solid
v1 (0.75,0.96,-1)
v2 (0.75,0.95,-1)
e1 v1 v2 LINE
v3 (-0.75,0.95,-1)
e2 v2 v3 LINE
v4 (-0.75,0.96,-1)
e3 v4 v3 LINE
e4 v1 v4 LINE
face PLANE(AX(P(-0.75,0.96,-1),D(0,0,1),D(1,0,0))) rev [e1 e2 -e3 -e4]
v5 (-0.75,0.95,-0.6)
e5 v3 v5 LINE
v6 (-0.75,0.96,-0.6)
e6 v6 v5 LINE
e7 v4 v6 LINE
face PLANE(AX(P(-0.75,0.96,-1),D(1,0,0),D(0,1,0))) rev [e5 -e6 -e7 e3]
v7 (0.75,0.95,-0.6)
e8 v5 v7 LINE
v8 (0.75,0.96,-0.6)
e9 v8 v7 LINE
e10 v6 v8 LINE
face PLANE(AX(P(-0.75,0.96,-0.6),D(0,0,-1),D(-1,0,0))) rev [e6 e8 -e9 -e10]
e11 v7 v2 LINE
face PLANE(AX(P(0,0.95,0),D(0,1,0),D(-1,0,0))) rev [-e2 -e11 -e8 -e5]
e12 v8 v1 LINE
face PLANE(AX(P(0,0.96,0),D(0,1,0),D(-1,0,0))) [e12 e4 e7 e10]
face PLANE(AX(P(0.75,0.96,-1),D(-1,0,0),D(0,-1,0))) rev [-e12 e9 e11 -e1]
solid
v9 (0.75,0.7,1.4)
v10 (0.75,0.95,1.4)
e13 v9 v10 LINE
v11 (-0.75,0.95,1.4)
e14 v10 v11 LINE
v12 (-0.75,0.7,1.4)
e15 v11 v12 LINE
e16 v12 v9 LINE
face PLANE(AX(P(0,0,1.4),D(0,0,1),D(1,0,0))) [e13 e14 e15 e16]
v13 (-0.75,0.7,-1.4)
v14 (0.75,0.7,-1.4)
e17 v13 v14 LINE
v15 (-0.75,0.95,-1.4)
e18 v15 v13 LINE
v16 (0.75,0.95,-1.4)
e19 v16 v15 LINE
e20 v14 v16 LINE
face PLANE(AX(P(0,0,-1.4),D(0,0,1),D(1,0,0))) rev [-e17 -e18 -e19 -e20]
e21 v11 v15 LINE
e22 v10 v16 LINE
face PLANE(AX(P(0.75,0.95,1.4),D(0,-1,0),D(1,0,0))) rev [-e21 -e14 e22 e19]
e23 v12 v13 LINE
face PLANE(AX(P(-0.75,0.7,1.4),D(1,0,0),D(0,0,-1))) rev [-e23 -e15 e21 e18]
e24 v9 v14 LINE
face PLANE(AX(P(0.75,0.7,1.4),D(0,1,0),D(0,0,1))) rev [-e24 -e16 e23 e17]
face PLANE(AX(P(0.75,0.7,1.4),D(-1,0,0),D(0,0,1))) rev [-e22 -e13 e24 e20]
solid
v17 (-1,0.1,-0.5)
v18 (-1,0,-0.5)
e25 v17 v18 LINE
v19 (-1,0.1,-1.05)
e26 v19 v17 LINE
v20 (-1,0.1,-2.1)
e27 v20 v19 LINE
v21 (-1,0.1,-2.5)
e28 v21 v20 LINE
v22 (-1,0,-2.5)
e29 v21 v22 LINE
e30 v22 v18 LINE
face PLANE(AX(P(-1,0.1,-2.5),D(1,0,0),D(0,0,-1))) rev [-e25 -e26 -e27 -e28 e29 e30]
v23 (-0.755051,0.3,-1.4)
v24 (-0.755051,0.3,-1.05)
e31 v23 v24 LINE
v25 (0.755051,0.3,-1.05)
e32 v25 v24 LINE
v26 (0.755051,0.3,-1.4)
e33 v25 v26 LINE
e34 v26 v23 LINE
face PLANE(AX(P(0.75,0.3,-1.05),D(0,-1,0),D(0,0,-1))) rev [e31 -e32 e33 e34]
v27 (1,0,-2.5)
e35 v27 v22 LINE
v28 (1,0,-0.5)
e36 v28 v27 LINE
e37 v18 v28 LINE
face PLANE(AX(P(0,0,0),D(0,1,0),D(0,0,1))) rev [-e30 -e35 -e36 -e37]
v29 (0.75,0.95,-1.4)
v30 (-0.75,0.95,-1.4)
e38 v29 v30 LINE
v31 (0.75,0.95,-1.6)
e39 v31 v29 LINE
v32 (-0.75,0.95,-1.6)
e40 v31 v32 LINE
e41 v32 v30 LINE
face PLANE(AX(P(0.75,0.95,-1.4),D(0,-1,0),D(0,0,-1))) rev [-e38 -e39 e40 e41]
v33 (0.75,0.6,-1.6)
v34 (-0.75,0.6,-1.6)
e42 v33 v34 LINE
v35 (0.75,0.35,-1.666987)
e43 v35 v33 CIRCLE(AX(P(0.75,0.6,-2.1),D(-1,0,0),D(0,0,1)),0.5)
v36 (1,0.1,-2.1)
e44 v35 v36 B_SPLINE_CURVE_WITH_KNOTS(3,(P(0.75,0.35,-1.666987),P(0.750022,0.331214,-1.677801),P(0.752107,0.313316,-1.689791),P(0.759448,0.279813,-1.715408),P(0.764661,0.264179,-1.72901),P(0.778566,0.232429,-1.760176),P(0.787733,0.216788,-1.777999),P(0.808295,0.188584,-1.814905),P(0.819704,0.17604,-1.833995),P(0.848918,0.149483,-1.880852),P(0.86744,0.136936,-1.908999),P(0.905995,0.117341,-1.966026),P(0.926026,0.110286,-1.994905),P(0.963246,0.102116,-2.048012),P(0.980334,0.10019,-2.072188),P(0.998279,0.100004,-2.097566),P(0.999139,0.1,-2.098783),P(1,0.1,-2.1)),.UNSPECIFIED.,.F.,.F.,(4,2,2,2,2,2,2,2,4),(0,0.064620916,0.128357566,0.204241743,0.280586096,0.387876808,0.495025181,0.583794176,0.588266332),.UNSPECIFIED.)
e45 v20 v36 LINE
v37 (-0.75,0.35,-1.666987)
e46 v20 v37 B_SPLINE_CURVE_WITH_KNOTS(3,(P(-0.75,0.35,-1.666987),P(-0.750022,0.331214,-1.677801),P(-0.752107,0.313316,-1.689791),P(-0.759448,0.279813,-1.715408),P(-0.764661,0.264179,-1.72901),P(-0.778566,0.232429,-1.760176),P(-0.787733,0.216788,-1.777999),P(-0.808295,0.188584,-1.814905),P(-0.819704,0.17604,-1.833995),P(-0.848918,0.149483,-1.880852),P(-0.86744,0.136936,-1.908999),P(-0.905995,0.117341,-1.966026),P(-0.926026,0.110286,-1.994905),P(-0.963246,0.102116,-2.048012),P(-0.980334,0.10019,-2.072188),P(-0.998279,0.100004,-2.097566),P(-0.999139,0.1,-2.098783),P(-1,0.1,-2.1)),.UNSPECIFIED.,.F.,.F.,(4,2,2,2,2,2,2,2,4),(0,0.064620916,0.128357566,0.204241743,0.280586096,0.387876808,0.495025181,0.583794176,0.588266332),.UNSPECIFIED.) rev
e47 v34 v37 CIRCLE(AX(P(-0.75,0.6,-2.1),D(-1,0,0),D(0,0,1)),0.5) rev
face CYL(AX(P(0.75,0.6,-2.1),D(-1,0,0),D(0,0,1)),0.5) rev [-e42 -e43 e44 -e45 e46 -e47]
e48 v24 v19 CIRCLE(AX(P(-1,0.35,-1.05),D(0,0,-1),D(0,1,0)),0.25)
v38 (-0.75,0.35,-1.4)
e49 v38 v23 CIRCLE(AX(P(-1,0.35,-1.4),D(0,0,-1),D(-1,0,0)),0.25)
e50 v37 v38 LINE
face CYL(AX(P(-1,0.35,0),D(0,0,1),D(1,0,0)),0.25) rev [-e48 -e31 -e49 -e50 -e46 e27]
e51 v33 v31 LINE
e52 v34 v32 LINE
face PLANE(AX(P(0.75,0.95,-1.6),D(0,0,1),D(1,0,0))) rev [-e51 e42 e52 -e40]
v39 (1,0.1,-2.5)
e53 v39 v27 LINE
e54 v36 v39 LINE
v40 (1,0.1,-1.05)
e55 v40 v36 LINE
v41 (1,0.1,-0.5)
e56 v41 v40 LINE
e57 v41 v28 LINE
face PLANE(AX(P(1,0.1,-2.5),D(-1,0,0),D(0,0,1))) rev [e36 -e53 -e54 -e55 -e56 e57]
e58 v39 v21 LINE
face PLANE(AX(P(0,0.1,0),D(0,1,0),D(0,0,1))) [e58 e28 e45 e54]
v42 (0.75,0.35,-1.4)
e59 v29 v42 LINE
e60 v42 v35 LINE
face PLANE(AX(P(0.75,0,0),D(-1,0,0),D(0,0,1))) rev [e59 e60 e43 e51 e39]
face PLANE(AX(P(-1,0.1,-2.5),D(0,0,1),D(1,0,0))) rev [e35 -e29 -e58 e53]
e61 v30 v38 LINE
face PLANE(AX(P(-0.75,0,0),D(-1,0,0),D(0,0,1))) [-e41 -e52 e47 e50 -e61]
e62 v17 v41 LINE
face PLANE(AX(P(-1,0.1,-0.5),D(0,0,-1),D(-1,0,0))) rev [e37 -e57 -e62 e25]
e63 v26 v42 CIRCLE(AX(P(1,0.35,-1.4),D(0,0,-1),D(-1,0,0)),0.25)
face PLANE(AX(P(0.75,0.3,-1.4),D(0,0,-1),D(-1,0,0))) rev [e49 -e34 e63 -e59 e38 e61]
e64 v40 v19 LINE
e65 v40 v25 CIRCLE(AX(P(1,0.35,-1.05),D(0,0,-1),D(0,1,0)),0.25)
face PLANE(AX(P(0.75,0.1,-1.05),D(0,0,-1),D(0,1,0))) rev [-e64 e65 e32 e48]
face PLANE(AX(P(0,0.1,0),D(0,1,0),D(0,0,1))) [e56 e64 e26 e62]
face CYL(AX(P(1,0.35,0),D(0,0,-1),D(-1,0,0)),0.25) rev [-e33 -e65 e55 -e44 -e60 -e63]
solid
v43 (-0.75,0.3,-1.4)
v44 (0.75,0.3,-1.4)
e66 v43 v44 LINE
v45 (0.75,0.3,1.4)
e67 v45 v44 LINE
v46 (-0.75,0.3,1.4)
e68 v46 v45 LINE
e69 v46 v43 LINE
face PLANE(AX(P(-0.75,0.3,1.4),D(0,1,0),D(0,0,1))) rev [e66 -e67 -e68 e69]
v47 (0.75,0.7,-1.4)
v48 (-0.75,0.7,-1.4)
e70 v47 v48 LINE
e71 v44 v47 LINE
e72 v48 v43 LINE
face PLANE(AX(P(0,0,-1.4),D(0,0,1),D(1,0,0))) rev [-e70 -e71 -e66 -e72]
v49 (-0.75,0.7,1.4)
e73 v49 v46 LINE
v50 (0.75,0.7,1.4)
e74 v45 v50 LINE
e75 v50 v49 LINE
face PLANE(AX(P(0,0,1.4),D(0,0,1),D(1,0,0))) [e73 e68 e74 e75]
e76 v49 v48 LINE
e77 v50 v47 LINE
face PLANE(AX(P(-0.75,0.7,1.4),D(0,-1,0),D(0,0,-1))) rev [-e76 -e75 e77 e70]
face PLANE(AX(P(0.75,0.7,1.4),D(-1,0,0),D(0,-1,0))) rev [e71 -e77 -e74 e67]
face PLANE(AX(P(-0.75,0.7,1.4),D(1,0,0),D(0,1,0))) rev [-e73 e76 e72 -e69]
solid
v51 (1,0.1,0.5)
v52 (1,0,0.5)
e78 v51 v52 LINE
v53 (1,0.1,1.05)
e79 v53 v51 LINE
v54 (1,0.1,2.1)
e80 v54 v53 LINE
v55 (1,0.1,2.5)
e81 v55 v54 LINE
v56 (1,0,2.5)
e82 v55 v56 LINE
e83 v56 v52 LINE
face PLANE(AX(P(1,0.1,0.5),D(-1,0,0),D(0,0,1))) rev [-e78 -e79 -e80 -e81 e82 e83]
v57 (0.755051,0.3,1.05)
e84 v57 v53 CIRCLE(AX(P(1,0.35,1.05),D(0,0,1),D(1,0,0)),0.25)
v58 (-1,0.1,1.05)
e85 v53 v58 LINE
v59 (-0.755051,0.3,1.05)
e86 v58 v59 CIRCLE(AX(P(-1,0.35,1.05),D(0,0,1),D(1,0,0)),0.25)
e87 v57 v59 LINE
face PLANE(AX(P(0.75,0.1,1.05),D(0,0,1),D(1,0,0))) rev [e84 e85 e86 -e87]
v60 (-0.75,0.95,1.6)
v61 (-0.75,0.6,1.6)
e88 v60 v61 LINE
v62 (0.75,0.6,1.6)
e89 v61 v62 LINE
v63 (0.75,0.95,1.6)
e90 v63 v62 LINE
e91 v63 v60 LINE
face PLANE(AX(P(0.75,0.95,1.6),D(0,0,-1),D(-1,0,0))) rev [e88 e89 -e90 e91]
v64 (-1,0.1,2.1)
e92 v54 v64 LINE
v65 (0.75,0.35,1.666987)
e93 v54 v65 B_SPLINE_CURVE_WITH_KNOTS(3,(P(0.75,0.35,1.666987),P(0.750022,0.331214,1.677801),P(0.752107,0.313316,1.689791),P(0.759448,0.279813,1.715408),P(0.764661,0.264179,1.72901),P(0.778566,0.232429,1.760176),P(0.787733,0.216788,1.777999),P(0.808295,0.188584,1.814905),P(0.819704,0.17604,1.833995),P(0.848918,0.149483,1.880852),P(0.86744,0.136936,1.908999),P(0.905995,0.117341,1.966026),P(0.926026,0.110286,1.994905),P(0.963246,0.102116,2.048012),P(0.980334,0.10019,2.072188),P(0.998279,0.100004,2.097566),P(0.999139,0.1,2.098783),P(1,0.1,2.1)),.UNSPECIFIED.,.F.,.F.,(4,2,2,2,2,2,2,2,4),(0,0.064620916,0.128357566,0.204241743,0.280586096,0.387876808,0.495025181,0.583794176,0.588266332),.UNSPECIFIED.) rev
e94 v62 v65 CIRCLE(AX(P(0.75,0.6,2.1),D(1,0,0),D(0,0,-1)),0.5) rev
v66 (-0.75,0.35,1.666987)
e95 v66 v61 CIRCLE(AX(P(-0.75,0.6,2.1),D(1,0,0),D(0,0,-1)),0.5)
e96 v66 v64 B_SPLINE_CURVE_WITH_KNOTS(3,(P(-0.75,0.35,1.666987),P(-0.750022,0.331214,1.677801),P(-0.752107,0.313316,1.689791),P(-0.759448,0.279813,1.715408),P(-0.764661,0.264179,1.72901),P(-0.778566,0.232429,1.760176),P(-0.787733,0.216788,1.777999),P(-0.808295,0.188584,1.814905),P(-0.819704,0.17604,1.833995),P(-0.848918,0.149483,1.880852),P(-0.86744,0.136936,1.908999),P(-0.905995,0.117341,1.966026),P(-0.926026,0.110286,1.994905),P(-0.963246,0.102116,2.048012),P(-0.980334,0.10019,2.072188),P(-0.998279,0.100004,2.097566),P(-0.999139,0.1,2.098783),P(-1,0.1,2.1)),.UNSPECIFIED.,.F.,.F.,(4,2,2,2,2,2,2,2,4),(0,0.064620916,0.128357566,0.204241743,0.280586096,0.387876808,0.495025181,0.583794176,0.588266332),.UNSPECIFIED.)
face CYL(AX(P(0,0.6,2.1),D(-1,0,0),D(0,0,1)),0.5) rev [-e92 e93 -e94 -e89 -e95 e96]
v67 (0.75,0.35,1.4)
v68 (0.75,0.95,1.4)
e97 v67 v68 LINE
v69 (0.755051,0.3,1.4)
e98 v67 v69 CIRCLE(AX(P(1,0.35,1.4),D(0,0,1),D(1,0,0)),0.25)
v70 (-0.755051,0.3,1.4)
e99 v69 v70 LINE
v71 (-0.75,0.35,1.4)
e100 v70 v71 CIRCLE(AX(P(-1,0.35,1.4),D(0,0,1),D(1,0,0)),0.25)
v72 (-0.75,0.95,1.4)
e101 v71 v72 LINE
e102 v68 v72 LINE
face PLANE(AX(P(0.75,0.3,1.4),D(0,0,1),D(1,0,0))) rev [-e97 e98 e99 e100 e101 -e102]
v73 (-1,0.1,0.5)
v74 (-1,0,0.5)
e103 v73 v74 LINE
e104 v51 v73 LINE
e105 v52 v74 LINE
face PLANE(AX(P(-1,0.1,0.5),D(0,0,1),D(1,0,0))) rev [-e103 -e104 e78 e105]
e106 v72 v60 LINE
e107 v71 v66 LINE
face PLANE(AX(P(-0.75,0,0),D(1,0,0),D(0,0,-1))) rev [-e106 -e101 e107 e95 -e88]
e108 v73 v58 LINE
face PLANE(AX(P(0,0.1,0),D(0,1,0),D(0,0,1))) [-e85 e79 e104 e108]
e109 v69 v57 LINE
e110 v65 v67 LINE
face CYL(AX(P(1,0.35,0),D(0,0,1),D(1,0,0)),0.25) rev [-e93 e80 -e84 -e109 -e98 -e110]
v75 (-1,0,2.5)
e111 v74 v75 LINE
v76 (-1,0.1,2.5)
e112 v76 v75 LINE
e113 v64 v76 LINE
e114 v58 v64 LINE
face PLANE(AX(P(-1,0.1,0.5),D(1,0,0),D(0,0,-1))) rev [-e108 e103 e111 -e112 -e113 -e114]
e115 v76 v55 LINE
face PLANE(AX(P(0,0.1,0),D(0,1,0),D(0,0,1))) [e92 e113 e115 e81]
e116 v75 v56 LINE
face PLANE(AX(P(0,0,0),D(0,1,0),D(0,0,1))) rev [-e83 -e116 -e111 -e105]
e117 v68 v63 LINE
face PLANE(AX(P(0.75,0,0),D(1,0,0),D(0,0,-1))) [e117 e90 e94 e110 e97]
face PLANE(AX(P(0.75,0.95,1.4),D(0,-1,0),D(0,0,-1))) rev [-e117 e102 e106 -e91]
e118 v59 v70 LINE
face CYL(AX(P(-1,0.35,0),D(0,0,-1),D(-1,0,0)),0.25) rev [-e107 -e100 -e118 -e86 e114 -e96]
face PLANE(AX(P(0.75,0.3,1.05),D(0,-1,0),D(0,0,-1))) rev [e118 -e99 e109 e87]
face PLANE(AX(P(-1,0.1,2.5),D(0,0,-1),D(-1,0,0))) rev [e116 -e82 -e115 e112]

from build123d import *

# Parameters (mm, degrees)
SKETCH1_W             = 1.5
SKETCH1_H             = 0.4
BOSS_EXTRUDE1_DEPTH   = 1.4
BOSS_EXTRUDE2_DEPTH   = 0.75
BOSS_EXTRUDE2_2_DEPTH = 0.75
SKETCH5_W             = 1.5
SKETCH5_H             = 0.25
BOSS_EXTRUDE4_DEPTH   = 1.4
SKETCH4_W             = 2
SKETCH4_H             = 2
BOSS_EXTRUDE3_DEPTH   = 0.1
SKETCH6_W             = 1.5
SKETCH6_H             = 0.4
BOSS_EXTRUDE5_DEPTH   = 0.01
FILLET1_R             = 0.5
FILLET2_R             = 0.5
FILLET3_START         = -1.5999999
FILLET3_DEPTH         = 0.5499999
FILLET3_START_2       = -2.1000001
FILLET3_2_DEPTH       = 0.5000001
FILLET3_START_3       = -2
FILLET3_3_OUTLINE_W   = 0.05
FILLET3_3_OUTLINE_H   = 0.35
FILLET3_3_DEPTH       = 4
FILLET4_START         = 1.05
FILLET4_DEPTH         = 0.5499999
FILLET4_START_2       = 1.5999999
FILLET4_2_DEPTH       = 0.5000001
FILLET4_START_3       = -2
FILLET4_3_OUTLINE_W   = 0.05
FILLET4_3_OUTLINE_H   = 0.35
FILLET4_3_DEPTH       = 4


with BuildPart() as part:
    # Sketch1 → Boss-Extrude1 (new, symmetric)
    with BuildSketch(Plane.XY):
        with Locations((0, 0.5)):
            Rectangle(SKETCH1_W, SKETCH1_H)
    extrude(amount=BOSS_EXTRUDE1_DEPTH, both=True)


with BuildPart() as body_2:
    # Sketch3 → Boss-Extrude2 (new, symmetric)
    with BuildSketch(Plane(origin=(0, 0, 0), x_dir=(0, 0, -1), z_dir=(1, 0, 0))):
        Polygon((-1.4, 0.95), (-1.6, 0.95), (-1.6, 0.1), (-1.05, 0.1), (-1.05, 0.3), (-1.4, 0.3), align=None)
    extrude(amount=BOSS_EXTRUDE2_DEPTH, both=True)



with BuildPart() as body_3:
    # Sketch3 → Boss-Extrude2 2 (new, symmetric)
    with BuildSketch(Plane(origin=(0, 0, 0), x_dir=(0, 0, -1), z_dir=(1, 0, 0))):
        Polygon((1.4, 0.95), (1.6, 0.95), (1.6, 0.1), (1.05, 0.1), (1.05, 0.3), (1.4, 0.3), align=None)
    extrude(amount=BOSS_EXTRUDE2_2_DEPTH, both=True)


with BuildPart() as body_4:
    # Sketch5 → Boss-Extrude4 (new, symmetric)
    with BuildSketch(Plane.XY):
        with Locations((0, 0.825)):
            Rectangle(SKETCH5_W, SKETCH5_H)
    extrude(amount=BOSS_EXTRUDE4_DEPTH, both=True)


with BuildPart() as body_2_1:
    add(body_2.part)

    add(body_3.part)  # Boss-Extrude3 merges body 3
    # Sketch4 → Boss-Extrude3 (add)
    with BuildSketch(Plane(origin=(0, 0, 0), x_dir=(1, 0, 0), z_dir=(0, 1, 0))):
        with Locations((0, 1.5)):
            Rectangle(SKETCH4_W, SKETCH4_H)
        with Locations((0, -1.5)):
            Rectangle(SKETCH4_W, SKETCH4_H)
    extrude(amount=BOSS_EXTRUDE3_DEPTH)

    # Fillet1
    fillet1_edges = [body_2_1.edges().sort_by_distance(p)[0] for p in [
        (0, 0.1, 1.6),
    ]]
    fillet(fillet1_edges, radius=FILLET1_R)

    # Fillet2
    fillet2_edges = [body_2_1.edges().sort_by_distance(p)[0] for p in [
        (0, 0.1, -1.6),
    ]]
    fillet(fillet2_edges, radius=FILLET2_R)

    # Fillet3: read off the stored shape, not the designer's step
    # Fillet3 outline → Fillet3 (add)
    with BuildSketch(Plane.XY.offset(FILLET3_START)):
        with BuildLine():
            Line((0.75, 0.1), (1, 0.1))
            ThreePointArc((1, 0.1), (0.823223305, 0.173223305), (0.75, 0.35))
            Line((0.75, 0.35), (0.75, 0.1))
        make_face()
        with BuildLine():
            Line((-1, 0.1), (-0.75, 0.1))
            Line((-0.75, 0.1), (-0.75, 0.35))
            ThreePointArc((-0.75, 0.35), (-0.823223305, 0.173223305), (-1, 0.1))
        make_face()
    extrude(amount=FILLET3_DEPTH)

    # Fillet3 2 outline → Fillet3 2 (add)
    with BuildSketch(Plane.XY.offset(FILLET3_START_2)):
        with BuildLine():
            Line((0.75, 0.1), (1, 0.1))
            ThreePointArc((1, 0.1), (0.823223305, 0.173223305), (0.75, 0.35))
            Line((0.75, 0.35), (0.75, 0.1))
        make_face()
        with BuildLine():
            Line((-1, 0.1), (-0.75, 0.1))
            Line((-0.75, 0.1), (-0.75, 0.35))
            ThreePointArc((-0.75, 0.35), (-0.823223305, 0.173223305), (-1, 0.1))
        make_face()
    extrude(amount=FILLET3_2_DEPTH)

    # Fillet3 3 outline → Fillet3 3 (cut)
    with BuildSketch(Plane.YZ.offset(FILLET3_START_3)):
        with BuildLine():
            Line((0.1, -2.1), (0.35, -2.1000001))
            Line((0.35, -2.1000001), (0.35, -1.666987298))
            ThreePointArc((0.35, -1.666987298), (0.166987298, -1.85), (0.1, -2.1))
        make_face()
        with Locations((0.325, -1.225)):
            Rectangle(FILLET3_3_OUTLINE_W, FILLET3_3_OUTLINE_H)
    extrude(amount=FILLET3_3_DEPTH, mode=Mode.SUBTRACT)

    # Fillet4: read off the stored shape, not the designer's step
    # Fillet4 outline → Fillet4 (add)
    with BuildSketch(Plane.XY.offset(FILLET4_START)):
        with BuildLine():
            Line((-0.75, 0.1), (-0.75, 0.35))
            ThreePointArc((-0.75, 0.35), (-0.823223305, 0.173223305), (-1, 0.1))
            Line((-1, 0.1), (-0.75, 0.1))
        make_face()
        with BuildLine():
            Line((0.75, 0.35), (0.75, 0.1))
            Line((0.75, 0.1), (1, 0.1))
            ThreePointArc((1, 0.1), (0.823223305, 0.173223305), (0.75, 0.35))
        make_face()
    extrude(amount=FILLET4_DEPTH)

    # Fillet4 2 outline → Fillet4 2 (add)
    with BuildSketch(Plane.XY.offset(FILLET4_START_2)):
        with BuildLine():
            Line((-0.75, 0.1), (-0.75, 0.35))
            ThreePointArc((-0.75, 0.35), (-0.823223305, 0.173223305), (-1, 0.1))
            Line((-1, 0.1), (-0.75, 0.1))
        make_face()
        with BuildLine():
            Line((0.75, 0.35), (0.75, 0.1))
            Line((0.75, 0.1), (1, 0.1))
            ThreePointArc((1, 0.1), (0.823223305, 0.173223305), (0.75, 0.35))
        make_face()
    extrude(amount=FILLET4_2_DEPTH)

    # Fillet4 3 outline → Fillet4 3 (cut)
    with BuildSketch(Plane.YZ.offset(FILLET4_START_3)):
        with BuildLine():
            ThreePointArc((0.1, 2.1), (0.166987298, 1.85), (0.35, 1.666987298))
            Line((0.35, 1.666987298), (0.35, 2.1))
            Line((0.35, 2.1), (0.1, 2.1))
        make_face()
        with Locations((0.325, 1.225)):
            Rectangle(FILLET4_3_OUTLINE_W, FILLET4_3_OUTLINE_H)
    extrude(amount=FILLET4_3_DEPTH, mode=Mode.SUBTRACT)


with BuildPart() as body_4_2:
    # Sketch6 → Boss-Extrude5 (new body)
    with BuildSketch(Plane(origin=(0, 0.95, 0), x_dir=(1, 0, 0), z_dir=(0, 1, 0))):
        with Locations((0, 0.8)):
            Rectangle(SKETCH6_W, SKETCH6_H)
    extrude(amount=BOSS_EXTRUDE5_DEPTH)


solid = Compound([part.part, body_4.part, body_2_1.part, body_4_2.part])
